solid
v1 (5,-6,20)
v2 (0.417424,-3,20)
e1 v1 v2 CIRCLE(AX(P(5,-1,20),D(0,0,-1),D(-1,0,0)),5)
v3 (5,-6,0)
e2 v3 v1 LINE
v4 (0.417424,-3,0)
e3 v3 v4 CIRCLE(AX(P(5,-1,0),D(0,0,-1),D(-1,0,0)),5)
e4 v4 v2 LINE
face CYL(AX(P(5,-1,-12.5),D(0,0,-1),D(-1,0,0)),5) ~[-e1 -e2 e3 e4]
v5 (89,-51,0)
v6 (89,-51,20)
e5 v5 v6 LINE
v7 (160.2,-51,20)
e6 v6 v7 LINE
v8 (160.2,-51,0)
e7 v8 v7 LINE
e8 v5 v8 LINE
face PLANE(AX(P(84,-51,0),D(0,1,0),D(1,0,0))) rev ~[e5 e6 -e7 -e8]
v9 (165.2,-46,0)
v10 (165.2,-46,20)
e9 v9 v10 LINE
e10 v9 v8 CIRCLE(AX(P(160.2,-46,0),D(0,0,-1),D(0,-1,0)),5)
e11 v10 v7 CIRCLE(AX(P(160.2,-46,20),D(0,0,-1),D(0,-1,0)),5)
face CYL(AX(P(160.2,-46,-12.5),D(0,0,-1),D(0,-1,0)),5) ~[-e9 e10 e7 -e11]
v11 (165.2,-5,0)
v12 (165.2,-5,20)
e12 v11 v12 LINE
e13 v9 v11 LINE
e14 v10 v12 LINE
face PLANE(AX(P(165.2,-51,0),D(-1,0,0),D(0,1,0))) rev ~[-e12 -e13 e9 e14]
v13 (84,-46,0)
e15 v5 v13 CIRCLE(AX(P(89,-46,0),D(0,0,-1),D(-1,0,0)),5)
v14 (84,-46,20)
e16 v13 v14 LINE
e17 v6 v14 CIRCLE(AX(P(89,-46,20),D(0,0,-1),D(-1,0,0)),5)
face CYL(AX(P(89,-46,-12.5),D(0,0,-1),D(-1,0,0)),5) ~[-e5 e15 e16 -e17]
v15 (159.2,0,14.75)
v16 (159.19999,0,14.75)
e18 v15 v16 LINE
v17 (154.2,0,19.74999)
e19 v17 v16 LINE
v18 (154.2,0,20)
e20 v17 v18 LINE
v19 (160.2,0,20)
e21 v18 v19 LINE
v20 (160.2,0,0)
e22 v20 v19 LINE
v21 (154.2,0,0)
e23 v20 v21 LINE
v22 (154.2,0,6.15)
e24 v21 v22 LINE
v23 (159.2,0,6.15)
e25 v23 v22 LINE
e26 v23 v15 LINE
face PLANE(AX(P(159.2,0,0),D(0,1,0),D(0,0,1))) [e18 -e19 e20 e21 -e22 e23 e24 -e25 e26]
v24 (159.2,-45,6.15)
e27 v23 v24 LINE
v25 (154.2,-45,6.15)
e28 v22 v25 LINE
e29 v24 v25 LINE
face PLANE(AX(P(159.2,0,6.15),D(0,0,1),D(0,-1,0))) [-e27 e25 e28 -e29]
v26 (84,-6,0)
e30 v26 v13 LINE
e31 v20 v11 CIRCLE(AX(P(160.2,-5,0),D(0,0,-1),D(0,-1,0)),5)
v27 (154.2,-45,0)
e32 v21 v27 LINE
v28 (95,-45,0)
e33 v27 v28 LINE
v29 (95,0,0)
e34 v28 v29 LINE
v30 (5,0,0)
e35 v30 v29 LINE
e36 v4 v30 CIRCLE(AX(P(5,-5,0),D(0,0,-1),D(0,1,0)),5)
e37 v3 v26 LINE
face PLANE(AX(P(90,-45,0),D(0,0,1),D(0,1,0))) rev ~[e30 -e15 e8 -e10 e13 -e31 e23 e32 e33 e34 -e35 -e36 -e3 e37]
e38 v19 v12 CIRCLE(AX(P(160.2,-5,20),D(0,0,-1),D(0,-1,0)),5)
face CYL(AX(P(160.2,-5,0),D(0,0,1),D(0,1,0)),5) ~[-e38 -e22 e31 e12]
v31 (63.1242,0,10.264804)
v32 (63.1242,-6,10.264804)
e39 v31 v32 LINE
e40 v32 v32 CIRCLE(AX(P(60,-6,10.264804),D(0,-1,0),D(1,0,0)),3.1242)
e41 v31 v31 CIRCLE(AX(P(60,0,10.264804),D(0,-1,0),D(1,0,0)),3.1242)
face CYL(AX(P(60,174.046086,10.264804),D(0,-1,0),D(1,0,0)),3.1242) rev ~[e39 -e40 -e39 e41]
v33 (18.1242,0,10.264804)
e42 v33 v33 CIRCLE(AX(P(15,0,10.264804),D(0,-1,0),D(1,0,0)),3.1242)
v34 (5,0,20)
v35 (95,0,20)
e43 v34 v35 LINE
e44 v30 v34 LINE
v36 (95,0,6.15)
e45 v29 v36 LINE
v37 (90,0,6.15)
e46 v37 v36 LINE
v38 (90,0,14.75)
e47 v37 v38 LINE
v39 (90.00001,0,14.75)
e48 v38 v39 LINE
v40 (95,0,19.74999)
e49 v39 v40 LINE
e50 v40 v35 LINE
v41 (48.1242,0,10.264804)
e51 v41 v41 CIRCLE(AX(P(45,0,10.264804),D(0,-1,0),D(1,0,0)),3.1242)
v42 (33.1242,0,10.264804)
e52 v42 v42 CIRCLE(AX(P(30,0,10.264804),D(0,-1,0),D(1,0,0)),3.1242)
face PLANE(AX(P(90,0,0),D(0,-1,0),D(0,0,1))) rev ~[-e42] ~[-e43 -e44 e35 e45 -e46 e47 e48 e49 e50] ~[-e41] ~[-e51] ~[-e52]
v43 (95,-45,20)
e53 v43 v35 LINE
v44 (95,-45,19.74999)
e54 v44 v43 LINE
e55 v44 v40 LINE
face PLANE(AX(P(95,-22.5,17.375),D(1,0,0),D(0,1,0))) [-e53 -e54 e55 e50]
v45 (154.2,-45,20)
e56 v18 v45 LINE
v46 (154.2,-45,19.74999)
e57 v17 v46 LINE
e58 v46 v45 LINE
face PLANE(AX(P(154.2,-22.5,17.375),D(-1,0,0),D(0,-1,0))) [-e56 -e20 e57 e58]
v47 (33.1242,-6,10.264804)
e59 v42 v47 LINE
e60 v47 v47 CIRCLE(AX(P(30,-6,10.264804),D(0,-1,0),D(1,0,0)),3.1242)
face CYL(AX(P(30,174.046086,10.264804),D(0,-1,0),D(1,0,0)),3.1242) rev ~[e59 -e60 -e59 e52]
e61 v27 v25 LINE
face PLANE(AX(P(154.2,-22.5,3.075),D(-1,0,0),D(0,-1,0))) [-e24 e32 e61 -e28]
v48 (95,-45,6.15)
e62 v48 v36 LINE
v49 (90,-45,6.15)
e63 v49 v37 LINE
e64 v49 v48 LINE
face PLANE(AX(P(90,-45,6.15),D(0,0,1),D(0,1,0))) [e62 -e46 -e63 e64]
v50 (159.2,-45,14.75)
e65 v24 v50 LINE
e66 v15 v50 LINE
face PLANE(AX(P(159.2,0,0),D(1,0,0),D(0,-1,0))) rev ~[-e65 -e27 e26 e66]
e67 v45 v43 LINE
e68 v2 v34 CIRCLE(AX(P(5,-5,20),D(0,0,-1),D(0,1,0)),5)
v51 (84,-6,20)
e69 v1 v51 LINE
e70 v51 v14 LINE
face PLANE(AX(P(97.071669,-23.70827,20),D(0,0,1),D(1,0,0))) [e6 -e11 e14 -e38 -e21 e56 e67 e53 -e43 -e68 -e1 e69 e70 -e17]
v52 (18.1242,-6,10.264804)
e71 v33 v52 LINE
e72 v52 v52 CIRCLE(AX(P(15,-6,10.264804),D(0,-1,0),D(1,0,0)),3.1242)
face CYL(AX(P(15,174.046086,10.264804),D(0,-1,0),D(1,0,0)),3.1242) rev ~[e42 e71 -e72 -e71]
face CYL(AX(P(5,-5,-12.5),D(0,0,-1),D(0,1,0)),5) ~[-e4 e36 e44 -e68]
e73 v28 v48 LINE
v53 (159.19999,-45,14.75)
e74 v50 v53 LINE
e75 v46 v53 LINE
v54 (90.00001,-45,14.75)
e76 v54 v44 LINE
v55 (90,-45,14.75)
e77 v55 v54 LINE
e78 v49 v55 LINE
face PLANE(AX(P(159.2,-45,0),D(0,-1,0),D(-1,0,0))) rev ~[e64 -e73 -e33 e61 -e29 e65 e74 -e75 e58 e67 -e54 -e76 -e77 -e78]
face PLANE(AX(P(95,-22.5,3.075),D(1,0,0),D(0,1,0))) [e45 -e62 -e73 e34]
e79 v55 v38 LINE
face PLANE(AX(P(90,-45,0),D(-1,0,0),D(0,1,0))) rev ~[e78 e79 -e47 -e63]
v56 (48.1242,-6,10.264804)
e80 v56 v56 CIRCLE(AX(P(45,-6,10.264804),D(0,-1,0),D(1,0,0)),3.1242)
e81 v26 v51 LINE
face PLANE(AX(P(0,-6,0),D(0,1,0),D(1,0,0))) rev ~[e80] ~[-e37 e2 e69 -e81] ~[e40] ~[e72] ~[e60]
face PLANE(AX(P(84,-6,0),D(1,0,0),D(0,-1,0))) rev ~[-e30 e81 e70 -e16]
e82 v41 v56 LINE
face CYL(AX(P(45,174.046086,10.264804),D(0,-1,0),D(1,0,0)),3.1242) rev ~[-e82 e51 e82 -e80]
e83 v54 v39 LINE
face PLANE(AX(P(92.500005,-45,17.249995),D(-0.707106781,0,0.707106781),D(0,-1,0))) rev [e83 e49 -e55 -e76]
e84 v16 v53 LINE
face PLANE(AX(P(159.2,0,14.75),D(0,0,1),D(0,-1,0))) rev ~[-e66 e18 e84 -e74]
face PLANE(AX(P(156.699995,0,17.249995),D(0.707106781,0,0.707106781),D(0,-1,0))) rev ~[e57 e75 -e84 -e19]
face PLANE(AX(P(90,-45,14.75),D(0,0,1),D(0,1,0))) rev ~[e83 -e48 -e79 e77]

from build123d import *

# Parameters (mm, degrees)
F1_DEPTH    = 20
F3_D        = 6.2484
F4_W        = 45
F4_H        = 6.15
F4_H_2      = 5.25
F6_DEPTH    = 5
F5_W        = 45
F5_H        = 6.15
F5_H_2      = 5.25
F7_DEPTH    = 5
F8_SIZE     = 4.99999
F9_T1_DEPTH = 45
F10_R       = 5


# Not quite as in the source:
# - a fillet or chamfer that OpenCascade refuses, or shapes differently, is made with other operations: its cross-section is extruded or revolved along the edge and cut away or added
# - a fillet or chamfer is up to 0.001 mm smaller than in the source, because OpenCascade refuses the exact size


with BuildPart() as f1:
    # F0 (on Top) → F1 (new body)
    with BuildSketch(Plane.XY):
        Polygon((90, 0), (0, 0), (0, -6), (84, -6), (84, -51), (90, -51), (165.2, -51), (165.2, -45), (165.2, 0), (159.2, 0), (159.2, -45), (90, -45), align=None)
    extrude(amount=F1_DEPTH)

    # F3 (through all)
    with Locations(Plane(origin=(0, 0, 0), x_dir=(-1, 0, 0), z_dir=(0, 1, 0))):
        with Locations((-45, 10.2648036554), (-30, 10.2648036554), (-15, 10.2648036554), (-60, 10.2648036554)):
            Hole(F3_D / 2)

    # F4 (on face) → F6 (join)
    with BuildSketch(Plane(origin=(159.2, 0, 0), x_dir=(0, -1, 0), z_dir=(-1, 0, 0))):
        with Locations((22.5, 3.075)):
            Rectangle(F4_W, F4_H)
        with Locations((22.5, 17.375)):
            Rectangle(F4_W, F4_H_2)
    extrude(amount=F6_DEPTH)

    # F5 (on face) → F7 (join)
    with BuildSketch(Plane.YZ.offset(90)):
        with Locations((-22.5, 3.075)):
            Rectangle(F5_W, F5_H)
        with Locations((-22.5, 17.375)):
            Rectangle(F5_W, F5_H_2)
    extrude(amount=F7_DEPTH)

    # F8 (size 5 in the source; OpenCascade refuses exactly that, so slightly less here)
    f8_edges = [f1.edges().sort_by_distance(p)[0] for p in [
        (154.2, -22.5, 14.75),
        (95, -22.5, 14.75),
    ]]
    chamfer(f8_edges, length=F8_SIZE)

    # F9: fillet of radius 5 on 4 edges, made by hand

    # F9_s2 → F9_t1 (cut)
    with BuildSketch(Plane.XY.offset(-12.5)):
        with BuildLine():
            ThreePointArc((160.2, -51), (163.7355339059, -49.5355339059), (165.2, -46))
            Line((165.2, -46), (165.2, -51))
            Line((165.2, -51), (160.2, -51))
        make_face()
        with BuildLine():
            ThreePointArc((84, -46), (85.4644660941, -49.5355339059), (89, -51))
            Line((89, -51), (84, -51))
            Line((84, -51), (84, -46))
        make_face()
        with BuildLine():
            ThreePointArc((5, 0), (1.4644660941, -1.4644660941), (0, -5))
            Line((0, -5), (0, 0))
            Line((0, 0), (5, 0))
        make_face()
        with BuildLine():
            ThreePointArc((0, -1), (1.4644660941, -4.5355339059), (5, -6))
            Line((5, -6), (0, -6))
            Line((0, -6), (0, -1))
        make_face()
    extrude(amount=F9_T1_DEPTH, mode=Mode.SUBTRACT)

    # F10
    f10_edges = [f1.edges().sort_by_distance(p)[0] for p in [
        (165.2, 0, 10),
    ]]
    fillet(f10_edges, radius=F10_R)


solid = f1.part
